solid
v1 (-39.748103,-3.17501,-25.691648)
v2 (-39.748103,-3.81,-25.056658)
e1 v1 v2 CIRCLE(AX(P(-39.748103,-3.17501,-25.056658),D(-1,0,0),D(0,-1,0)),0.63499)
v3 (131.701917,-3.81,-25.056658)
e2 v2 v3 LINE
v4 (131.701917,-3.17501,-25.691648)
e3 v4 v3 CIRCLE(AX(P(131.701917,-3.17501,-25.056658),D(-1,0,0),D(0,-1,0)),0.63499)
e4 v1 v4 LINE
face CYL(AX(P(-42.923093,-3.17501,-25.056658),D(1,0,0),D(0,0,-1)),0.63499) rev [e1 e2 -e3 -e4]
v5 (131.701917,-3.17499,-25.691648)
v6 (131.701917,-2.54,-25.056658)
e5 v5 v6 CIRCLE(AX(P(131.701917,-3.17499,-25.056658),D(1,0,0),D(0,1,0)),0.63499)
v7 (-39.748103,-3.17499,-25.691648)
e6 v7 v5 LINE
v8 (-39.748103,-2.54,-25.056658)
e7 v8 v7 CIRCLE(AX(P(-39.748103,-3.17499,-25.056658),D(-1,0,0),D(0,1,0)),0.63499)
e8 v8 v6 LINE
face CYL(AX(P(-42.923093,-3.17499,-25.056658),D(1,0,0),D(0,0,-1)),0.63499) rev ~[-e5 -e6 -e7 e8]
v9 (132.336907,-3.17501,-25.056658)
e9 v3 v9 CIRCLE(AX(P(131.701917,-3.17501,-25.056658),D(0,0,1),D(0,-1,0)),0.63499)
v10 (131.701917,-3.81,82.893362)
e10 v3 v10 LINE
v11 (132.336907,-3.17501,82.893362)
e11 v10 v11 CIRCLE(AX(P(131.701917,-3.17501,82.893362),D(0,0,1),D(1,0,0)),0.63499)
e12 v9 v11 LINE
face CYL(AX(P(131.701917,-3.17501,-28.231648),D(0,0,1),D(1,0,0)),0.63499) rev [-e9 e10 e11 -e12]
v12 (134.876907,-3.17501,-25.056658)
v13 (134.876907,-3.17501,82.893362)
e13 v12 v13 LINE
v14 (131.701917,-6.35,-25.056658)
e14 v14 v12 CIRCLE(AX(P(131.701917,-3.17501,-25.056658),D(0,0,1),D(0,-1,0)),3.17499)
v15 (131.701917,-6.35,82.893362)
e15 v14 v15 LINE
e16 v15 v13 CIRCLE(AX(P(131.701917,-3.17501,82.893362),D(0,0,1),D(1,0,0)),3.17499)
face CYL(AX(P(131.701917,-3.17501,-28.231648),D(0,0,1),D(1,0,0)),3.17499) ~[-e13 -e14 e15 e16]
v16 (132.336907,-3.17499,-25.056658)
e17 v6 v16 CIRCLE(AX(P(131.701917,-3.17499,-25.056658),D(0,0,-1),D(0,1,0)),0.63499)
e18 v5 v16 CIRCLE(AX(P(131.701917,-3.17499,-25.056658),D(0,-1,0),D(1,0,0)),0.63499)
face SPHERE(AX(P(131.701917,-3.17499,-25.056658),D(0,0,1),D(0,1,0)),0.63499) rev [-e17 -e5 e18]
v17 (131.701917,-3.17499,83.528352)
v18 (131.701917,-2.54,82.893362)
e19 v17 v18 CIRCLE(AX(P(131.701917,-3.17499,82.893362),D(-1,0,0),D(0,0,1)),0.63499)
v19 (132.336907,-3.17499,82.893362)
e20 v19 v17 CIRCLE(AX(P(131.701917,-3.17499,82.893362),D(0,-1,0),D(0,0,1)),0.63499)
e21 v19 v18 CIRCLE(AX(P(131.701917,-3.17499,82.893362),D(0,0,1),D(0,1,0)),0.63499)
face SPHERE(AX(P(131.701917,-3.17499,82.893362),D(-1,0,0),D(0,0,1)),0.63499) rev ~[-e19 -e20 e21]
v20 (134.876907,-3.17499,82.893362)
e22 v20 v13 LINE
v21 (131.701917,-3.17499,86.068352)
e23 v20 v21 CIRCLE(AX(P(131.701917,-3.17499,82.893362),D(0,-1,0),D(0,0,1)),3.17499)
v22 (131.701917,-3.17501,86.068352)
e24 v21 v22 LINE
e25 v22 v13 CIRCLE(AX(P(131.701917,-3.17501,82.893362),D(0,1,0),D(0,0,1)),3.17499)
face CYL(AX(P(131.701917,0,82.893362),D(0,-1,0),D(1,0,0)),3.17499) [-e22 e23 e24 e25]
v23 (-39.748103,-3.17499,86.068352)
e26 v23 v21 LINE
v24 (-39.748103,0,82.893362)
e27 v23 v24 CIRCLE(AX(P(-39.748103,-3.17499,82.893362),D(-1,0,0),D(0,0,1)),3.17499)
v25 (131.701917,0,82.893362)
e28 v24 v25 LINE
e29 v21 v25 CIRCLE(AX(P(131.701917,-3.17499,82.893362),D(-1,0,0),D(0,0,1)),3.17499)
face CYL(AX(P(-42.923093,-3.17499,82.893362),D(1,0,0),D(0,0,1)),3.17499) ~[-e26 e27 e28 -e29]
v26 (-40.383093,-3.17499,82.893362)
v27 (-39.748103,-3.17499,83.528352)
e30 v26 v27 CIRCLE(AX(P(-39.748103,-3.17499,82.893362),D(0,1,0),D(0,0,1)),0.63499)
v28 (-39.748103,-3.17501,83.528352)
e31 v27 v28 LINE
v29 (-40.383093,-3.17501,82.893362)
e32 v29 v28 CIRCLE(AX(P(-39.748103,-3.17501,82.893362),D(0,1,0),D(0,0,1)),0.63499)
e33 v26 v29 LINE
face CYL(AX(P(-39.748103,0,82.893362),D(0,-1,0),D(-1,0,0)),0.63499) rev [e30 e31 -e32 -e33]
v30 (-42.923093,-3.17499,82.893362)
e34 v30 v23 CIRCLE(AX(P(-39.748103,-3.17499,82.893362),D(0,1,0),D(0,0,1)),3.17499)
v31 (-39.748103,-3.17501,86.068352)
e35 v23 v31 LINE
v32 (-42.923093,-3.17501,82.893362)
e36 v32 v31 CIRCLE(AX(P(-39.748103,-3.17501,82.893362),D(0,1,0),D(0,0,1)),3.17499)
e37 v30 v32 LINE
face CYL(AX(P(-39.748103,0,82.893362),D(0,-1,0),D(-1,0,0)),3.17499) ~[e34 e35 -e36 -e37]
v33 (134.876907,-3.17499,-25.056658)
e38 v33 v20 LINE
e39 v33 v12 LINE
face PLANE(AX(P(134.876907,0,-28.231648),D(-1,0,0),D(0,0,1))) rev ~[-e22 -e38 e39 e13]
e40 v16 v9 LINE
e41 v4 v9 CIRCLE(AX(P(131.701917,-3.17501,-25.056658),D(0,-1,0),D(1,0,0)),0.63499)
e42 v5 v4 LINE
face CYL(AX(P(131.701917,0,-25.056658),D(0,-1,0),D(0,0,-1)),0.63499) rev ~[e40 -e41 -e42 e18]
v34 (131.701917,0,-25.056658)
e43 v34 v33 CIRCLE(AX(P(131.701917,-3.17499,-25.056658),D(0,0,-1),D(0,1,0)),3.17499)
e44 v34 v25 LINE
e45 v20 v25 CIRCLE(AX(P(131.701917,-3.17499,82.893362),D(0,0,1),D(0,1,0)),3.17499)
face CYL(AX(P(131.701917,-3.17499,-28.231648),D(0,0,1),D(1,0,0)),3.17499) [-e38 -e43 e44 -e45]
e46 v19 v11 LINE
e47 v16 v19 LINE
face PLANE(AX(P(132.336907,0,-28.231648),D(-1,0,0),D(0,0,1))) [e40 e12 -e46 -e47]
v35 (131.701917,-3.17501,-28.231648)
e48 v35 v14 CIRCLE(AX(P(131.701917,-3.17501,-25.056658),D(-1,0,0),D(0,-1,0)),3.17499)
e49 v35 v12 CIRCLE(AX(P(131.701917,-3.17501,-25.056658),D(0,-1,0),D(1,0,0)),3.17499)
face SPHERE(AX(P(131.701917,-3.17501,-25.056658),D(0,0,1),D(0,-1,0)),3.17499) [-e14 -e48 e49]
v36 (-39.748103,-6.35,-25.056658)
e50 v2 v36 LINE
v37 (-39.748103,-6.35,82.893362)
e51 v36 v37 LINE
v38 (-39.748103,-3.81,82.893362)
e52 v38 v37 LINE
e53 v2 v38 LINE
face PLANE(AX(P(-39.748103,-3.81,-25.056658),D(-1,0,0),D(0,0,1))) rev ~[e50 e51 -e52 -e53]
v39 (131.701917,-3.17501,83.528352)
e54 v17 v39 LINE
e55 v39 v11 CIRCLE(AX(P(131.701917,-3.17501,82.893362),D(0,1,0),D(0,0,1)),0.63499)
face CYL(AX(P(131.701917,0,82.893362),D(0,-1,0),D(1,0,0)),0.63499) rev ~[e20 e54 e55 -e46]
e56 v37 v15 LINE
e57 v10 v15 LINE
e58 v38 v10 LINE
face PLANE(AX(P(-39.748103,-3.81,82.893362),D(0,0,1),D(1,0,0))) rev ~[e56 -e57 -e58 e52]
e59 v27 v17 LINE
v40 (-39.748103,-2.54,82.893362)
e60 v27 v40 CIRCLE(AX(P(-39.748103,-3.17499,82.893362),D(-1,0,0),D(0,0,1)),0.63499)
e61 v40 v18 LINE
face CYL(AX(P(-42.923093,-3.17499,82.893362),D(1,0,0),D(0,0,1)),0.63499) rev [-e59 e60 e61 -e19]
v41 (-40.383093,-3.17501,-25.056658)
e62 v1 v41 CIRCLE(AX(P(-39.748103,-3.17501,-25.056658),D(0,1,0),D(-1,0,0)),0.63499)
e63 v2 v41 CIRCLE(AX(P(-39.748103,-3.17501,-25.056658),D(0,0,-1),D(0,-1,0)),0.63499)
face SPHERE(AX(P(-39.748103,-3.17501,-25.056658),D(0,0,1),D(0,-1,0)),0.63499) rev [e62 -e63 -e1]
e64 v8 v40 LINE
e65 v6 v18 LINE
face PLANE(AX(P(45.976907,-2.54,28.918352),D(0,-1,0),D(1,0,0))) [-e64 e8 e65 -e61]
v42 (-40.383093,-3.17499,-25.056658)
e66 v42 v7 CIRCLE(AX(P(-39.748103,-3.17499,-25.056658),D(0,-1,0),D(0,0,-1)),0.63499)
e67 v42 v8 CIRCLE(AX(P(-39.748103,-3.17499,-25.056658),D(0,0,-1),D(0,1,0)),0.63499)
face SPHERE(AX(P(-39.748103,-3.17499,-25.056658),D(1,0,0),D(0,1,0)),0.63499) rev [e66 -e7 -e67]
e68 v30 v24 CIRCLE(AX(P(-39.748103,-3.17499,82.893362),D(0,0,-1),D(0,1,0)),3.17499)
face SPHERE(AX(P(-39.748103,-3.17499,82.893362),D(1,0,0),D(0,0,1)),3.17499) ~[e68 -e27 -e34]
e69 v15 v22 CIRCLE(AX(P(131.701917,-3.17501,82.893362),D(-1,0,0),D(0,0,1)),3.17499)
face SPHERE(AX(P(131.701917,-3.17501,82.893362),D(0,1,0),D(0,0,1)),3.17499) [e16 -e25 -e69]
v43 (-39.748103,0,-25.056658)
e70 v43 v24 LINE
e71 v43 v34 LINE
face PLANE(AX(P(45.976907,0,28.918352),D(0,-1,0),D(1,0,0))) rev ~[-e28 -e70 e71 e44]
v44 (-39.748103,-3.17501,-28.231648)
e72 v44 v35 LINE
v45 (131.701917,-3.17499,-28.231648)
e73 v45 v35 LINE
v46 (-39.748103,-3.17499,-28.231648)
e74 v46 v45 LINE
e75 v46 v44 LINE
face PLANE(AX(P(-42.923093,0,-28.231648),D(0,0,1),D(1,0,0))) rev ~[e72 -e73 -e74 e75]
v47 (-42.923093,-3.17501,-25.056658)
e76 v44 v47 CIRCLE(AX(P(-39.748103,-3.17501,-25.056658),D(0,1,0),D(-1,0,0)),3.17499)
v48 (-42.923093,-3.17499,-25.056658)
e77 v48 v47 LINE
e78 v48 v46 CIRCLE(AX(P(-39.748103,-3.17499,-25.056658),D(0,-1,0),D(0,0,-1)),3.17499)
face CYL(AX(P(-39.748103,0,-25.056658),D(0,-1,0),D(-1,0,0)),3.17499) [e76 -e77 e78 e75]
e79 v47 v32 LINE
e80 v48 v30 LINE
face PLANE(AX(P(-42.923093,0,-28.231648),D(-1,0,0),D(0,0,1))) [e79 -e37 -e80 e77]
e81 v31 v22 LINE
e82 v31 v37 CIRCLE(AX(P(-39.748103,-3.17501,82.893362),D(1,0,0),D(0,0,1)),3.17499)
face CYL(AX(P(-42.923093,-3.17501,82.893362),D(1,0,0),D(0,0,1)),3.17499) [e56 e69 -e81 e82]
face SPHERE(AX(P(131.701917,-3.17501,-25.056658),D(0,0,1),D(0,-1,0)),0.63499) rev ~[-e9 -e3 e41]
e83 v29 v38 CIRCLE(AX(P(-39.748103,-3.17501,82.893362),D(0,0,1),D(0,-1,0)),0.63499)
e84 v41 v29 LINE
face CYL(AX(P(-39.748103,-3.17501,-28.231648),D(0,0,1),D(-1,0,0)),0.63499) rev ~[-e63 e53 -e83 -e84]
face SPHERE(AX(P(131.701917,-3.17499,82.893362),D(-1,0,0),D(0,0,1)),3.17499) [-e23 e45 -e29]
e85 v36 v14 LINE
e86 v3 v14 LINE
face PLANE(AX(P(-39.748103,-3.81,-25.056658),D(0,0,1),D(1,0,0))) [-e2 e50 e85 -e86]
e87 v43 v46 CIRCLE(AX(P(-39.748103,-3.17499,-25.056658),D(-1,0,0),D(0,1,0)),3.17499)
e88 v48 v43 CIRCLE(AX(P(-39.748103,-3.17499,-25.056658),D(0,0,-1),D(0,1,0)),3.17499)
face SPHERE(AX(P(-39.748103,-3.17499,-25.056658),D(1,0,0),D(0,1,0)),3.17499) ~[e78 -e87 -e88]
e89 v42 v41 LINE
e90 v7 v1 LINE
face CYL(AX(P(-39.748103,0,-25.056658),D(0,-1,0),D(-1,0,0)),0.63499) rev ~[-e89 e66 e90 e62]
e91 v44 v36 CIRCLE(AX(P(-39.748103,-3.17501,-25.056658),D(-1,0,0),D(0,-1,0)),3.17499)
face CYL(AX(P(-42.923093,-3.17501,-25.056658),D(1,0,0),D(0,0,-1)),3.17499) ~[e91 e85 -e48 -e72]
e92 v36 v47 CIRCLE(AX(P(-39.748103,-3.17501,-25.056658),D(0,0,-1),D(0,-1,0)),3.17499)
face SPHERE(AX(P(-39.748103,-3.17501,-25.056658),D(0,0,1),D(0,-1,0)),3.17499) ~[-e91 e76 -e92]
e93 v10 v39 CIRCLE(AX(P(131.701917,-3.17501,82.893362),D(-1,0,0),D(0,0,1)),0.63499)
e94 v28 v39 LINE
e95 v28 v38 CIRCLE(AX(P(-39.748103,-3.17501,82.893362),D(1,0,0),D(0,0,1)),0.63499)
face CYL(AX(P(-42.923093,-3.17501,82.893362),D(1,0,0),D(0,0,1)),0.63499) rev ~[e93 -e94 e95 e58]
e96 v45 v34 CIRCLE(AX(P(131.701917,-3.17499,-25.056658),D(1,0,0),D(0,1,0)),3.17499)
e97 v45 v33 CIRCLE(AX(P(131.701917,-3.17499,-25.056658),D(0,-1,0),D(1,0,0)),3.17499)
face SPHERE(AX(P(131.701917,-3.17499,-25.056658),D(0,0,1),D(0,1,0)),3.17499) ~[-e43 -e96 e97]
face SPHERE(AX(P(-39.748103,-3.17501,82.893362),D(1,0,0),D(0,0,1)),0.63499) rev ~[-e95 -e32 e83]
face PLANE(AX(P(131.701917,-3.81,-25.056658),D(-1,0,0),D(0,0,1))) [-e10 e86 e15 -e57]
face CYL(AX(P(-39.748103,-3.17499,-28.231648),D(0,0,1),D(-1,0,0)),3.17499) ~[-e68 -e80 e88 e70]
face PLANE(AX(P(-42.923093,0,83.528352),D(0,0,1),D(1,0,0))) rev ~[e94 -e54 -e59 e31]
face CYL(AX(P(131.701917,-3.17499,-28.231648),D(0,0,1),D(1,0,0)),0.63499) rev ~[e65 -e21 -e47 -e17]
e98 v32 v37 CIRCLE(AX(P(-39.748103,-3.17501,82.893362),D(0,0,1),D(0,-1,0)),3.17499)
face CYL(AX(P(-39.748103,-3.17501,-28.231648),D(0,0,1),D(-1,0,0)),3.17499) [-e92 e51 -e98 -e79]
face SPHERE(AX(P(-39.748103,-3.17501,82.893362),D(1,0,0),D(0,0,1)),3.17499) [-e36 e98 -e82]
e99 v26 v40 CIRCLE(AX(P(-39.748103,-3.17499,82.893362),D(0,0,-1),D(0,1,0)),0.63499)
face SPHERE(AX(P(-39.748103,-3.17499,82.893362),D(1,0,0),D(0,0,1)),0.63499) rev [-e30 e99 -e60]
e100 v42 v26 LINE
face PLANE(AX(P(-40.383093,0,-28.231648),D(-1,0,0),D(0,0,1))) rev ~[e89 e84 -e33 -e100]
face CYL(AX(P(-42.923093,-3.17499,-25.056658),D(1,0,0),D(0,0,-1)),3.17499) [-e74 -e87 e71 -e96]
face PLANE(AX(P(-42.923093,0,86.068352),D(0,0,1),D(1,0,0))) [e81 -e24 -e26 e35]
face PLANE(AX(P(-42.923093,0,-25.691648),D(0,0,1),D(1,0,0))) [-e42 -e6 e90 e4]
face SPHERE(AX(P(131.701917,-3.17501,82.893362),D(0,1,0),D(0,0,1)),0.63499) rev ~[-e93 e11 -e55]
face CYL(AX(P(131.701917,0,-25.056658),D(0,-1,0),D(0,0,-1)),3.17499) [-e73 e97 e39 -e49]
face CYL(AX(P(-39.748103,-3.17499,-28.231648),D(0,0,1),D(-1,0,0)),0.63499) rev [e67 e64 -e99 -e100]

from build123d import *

# Parameters (mm, degrees)
F0_W     = 177.8
F0_H     = 114.3
F1_DEPTH = 6.35
F2_R     = 3.17499
F3_T     = -2.54


# Not quite as in the source:
# - a fillet or chamfer is up to 0.001 mm smaller than in the source, because OpenCascade refuses the exact size
# - a shell that OpenCascade refuses in one call is made with other operations: the cavity is built on its own and cut out


with BuildPart() as f1:
    # F0 (on Front) → F1 (new body)
    with BuildSketch(Plane.XZ):
        with Locations((45.9769070864, 28.9183518412)):
            Rectangle(F0_W, F0_H)
    extrude(amount=F1_DEPTH)

    # F2 (radius 3.175 in the source; OpenCascade refuses exactly that, so slightly less here)
    f2_edges = [f1.edges().sort_by_distance(p)[0] for p in [
        (45.976907, 0, 86.068352),
        (134.876907, -3.175, 86.068352),
        (45.976907, -6.35, 86.068352),
        (-42.923093, -3.175, 86.068352),
        (-42.923093, -6.35, 28.918352),
        (134.876907, -6.35, 28.918352),
        (134.876907, 0, 28.918352),
        (45.976907, -6.35, -28.231648),
        (45.976907, 0, -28.231648),
        (-42.923093, 0, 28.918352),
        (134.876907, -3.175, -28.231648),
        (-42.923093, -3.175, -28.231648),
    ]]
    fillet(f2_edges, radius=F2_R)

    # F3: a shell. OpenCascade refuses it in one call, so the cavity is built on its own and cut out:
    # the body offset inwards by the wall thickness, plus a prism from it out through each open face.
    f3_core = offset(f1.part, amount=F3_T, mode=Mode.PRIVATE)
    f3_exits = [f3_core.faces().sort_by_distance(p)[0] for p in [
        (45.976907, -3.81, 28.918352),
    ]]
    add(f3_core, mode=Mode.SUBTRACT)
    extrude(f3_exits, amount=-F3_T, mode=Mode.SUBTRACT)


solid = f1.part
